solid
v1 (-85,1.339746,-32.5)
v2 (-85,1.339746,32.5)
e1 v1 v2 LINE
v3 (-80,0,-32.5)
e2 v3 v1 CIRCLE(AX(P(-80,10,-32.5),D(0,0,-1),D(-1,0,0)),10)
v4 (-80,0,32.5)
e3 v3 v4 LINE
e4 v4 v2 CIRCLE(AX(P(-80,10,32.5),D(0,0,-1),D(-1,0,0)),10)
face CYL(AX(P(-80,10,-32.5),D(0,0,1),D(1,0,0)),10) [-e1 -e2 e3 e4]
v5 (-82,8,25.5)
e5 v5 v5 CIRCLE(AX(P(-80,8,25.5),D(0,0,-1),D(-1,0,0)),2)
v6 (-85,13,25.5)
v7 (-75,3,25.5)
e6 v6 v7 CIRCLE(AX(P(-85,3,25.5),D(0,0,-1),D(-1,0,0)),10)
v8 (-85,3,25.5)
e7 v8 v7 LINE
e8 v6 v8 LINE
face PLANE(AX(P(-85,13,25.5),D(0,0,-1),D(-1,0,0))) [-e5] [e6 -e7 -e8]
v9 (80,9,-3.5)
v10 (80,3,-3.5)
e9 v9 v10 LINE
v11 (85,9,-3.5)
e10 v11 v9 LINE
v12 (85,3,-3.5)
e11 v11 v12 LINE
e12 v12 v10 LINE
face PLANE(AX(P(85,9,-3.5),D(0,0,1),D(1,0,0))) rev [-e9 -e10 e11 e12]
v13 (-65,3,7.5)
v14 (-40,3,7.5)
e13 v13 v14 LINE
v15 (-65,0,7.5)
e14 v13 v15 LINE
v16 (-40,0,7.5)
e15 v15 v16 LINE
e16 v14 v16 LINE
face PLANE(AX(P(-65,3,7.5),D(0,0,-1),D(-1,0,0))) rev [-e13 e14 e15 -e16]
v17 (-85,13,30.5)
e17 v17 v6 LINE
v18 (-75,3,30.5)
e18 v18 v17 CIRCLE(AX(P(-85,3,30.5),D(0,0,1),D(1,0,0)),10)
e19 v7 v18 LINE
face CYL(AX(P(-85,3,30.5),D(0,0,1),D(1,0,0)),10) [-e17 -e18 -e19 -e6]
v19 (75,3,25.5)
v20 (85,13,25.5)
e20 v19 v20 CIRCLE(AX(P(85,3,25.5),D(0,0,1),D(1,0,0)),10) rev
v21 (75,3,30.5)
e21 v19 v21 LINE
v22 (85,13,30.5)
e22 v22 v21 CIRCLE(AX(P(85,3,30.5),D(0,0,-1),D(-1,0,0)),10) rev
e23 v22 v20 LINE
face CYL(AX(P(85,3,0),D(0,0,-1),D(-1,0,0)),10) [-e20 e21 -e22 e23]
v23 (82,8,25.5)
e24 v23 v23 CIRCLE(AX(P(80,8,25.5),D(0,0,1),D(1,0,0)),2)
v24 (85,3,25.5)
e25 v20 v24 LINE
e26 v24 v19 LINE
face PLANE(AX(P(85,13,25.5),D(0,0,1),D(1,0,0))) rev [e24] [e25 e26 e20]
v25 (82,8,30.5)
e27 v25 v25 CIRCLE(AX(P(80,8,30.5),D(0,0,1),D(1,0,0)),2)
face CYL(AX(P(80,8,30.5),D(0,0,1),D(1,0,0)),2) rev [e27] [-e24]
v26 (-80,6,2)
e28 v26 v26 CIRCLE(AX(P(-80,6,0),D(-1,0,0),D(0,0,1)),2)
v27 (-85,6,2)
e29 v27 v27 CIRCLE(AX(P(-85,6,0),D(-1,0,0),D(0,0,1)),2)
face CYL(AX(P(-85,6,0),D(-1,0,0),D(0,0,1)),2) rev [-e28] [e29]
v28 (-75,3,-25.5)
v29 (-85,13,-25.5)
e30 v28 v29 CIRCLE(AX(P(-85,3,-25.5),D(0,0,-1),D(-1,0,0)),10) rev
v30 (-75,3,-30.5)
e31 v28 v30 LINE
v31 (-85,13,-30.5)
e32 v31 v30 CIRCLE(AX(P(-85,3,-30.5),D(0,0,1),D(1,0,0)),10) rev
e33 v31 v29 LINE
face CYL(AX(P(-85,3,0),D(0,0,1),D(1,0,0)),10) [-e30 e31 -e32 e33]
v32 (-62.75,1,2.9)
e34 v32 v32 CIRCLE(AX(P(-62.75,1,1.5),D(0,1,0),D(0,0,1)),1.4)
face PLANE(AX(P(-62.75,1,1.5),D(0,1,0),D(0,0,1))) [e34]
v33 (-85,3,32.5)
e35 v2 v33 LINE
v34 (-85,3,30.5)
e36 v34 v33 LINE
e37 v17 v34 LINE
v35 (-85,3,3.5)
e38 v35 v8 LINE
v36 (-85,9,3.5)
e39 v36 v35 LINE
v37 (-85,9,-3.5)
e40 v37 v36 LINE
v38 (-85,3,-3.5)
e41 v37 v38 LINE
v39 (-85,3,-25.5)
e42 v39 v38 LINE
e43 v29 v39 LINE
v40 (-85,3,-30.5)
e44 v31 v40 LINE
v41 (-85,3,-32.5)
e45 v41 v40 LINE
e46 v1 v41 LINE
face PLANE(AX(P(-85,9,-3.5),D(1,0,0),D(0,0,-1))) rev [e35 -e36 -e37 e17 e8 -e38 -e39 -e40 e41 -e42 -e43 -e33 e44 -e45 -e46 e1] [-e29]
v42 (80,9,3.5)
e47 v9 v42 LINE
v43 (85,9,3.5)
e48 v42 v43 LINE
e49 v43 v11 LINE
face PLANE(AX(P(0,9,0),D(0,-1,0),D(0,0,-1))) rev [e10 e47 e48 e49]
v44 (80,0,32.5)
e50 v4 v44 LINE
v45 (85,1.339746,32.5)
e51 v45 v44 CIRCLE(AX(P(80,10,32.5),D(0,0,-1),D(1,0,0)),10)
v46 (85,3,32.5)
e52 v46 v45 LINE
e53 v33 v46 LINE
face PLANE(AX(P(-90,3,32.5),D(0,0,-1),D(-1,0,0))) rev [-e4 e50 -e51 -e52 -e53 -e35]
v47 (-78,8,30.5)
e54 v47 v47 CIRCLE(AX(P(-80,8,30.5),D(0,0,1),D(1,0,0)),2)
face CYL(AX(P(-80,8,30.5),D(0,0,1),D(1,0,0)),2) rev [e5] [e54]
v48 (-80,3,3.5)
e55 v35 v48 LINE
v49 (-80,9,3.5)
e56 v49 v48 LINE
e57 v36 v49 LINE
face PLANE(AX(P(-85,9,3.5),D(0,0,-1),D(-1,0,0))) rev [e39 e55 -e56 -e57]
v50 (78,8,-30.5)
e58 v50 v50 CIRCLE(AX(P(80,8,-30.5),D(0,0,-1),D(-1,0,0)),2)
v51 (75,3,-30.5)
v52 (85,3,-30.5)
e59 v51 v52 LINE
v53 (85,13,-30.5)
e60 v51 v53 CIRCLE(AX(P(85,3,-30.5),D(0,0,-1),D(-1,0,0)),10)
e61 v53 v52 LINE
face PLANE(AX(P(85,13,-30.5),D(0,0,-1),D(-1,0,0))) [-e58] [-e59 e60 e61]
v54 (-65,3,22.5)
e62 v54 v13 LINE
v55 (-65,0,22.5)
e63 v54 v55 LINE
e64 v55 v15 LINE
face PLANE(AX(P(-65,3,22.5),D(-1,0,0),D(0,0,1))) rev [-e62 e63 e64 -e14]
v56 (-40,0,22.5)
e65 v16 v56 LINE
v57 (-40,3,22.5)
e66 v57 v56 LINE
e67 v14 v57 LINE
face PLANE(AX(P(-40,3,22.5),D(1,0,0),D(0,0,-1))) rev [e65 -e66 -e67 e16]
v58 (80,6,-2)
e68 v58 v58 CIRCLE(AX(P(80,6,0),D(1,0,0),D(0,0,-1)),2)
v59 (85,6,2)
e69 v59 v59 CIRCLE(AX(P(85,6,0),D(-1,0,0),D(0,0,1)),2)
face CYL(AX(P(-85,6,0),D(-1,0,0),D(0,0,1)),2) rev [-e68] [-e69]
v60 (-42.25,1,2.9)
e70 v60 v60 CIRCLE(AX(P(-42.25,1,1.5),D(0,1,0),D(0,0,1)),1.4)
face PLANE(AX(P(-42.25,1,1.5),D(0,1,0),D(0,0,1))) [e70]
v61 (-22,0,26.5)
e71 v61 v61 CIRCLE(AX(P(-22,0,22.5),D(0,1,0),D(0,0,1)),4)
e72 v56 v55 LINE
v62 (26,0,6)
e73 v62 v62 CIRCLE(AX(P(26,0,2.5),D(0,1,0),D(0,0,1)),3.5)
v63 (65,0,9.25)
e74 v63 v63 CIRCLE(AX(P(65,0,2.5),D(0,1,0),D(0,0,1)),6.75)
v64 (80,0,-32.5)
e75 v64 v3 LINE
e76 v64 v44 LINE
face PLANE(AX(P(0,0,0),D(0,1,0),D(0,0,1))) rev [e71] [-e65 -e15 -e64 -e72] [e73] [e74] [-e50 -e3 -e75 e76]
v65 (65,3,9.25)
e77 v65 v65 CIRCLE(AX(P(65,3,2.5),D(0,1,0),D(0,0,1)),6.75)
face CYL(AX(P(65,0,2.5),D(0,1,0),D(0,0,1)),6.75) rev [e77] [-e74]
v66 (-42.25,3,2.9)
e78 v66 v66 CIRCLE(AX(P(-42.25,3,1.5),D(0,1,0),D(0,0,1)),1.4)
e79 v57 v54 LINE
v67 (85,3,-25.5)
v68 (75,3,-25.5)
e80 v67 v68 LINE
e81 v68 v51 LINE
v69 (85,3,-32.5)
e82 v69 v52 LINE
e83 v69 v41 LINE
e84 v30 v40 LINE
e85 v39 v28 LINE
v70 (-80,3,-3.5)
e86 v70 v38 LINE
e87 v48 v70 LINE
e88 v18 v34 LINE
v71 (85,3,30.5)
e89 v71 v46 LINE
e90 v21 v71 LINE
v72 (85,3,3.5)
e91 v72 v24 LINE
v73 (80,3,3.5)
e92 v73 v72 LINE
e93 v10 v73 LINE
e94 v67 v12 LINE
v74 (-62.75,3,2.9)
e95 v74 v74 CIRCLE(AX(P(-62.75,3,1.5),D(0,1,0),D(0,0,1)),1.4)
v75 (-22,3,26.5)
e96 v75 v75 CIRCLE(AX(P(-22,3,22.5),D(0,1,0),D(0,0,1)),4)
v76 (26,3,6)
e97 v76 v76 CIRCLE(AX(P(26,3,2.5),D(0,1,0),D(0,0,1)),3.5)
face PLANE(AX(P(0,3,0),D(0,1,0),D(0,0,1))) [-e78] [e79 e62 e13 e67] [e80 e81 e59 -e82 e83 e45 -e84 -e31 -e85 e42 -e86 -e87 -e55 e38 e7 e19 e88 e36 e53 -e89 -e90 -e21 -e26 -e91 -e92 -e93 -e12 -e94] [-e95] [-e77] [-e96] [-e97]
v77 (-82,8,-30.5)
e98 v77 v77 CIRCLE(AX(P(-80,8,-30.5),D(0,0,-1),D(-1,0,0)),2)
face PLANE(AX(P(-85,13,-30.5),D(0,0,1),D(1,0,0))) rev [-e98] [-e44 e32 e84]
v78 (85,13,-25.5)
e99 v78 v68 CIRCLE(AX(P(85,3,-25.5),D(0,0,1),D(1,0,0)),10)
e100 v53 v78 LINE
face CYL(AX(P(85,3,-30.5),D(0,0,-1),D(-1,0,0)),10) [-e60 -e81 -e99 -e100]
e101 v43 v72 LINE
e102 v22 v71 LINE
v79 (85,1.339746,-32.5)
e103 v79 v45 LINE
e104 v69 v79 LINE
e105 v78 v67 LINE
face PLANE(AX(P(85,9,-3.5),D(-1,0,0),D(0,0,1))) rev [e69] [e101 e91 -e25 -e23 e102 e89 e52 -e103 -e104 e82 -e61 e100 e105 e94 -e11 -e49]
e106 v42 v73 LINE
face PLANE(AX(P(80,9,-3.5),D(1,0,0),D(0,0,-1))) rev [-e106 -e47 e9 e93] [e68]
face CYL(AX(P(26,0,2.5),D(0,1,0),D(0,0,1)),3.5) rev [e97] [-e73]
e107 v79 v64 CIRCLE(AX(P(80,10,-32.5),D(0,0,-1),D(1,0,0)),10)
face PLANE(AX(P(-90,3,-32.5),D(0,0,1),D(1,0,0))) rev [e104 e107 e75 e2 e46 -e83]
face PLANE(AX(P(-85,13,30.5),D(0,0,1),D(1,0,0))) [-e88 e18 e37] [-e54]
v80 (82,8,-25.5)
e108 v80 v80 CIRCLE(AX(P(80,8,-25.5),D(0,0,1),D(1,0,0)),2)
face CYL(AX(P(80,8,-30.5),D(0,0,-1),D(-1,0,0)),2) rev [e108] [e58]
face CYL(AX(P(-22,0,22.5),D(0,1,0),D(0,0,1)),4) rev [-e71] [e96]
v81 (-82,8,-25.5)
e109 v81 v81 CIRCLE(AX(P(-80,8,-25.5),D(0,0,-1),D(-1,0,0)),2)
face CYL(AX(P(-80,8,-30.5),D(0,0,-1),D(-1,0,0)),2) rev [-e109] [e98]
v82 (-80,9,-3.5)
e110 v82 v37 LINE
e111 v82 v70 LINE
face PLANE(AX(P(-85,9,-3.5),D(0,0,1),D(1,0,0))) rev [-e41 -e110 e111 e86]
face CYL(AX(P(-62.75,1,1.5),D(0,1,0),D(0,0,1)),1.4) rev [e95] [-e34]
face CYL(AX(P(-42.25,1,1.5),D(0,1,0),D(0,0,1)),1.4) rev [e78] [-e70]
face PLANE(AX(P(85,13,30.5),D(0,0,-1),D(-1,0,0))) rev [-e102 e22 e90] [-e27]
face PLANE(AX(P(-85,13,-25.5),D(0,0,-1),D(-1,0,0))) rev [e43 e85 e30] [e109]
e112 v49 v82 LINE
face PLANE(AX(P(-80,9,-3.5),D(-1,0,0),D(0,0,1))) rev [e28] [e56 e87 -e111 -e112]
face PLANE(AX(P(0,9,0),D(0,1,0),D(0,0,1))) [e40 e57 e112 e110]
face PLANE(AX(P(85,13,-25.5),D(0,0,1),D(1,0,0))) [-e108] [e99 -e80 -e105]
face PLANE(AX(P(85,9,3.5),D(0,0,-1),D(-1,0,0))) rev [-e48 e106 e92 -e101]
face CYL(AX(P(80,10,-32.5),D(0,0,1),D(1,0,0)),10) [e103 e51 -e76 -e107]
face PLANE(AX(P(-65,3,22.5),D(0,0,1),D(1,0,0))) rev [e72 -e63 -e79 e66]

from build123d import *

# Parameters (mm, degrees)
SKIZZE1_W                                  = 180
SKIZZE1_H                                  = 65
AUFSATZ_LINEAR_AUSTRAGEN1_DEPTH            = 3
SKIZZE2_W                                  = 25
SKIZZE2_H                                  = 15
SCHNITT_LINEAR_AUSTRAGEN1_DEPTH            = 3
SKIZZE3_W                                  = 5
SKIZZE3_H                                  = 7
AUFSATZ_LINEAR_AUSTRAGEN2_DEPTH            = 6
F_4_0_4_DURCHMESSER_BOHRUNG1_D             = 4
SCHNITT_LINEAR_AUSTRAGEN4_DEPTH            = 112.382224794
SKIZZE7_W                                  = 10
SKIZZE7_H                                  = 5
AUFSATZ_LINEAR_AUSTRAGEN3_DEPTH            = 10
SPIEGELN1_AT_THE_SECOND_PLANE_COPY_1_SKE_W = 10
SPIEGELN1_AT_THE_SECOND_PLANE_COPY_1_SKE_H = 5
SPIEGELN1_AT_THE_SECOND_PLANE_COPY_1_DEPTH = 10
VERRUNDUNG2_R                              = 10
F_4_0_4_DURCHMESSER_BOHRUNG3_D             = 4
F_4_0_4_DURCHMESSER_BOHRUNG3_DEPTH         = 5
F_4_0_4_DURCHMESSER_BOHRUNG4_D             = 4
F_4_0_4_DURCHMESSER_BOHRUNG4_DEPTH         = 5
SKIZZE14_R                                 = 3.5
SKIZZE14_R_2                               = 6.75
SKIZZE14_R_3                               = 4
SCHNITT_LINEAR_AUSTRAGEN5_DEPTH            = 92.549167118
SKIZZE17_R                                 = 1.4
SCHNITT_LINEAR_AUSTRAGEN6_DEPTH            = 2


with BuildPart() as part:
    # Skizze1 → Aufsatz-Linear austragen1 (new body)
    with BuildSketch(Plane(origin=(0, 0, 0), x_dir=(1, 0, 0), z_dir=(0, 1, 0))):
        Rectangle(SKIZZE1_W, SKIZZE1_H)
    extrude(amount=AUFSATZ_LINEAR_AUSTRAGEN1_DEPTH)

    # Skizze2 → Schnitt-Linear austragen1 (cut)
    with BuildSketch(Plane(origin=(0, 0, 0), x_dir=(-1, 0, 0), z_dir=(0, -1, 0))):
        with Locations((52.5, -15)):
            Rectangle(SKIZZE2_W, SKIZZE2_H)
    extrude(amount=-SCHNITT_LINEAR_AUSTRAGEN1_DEPTH, mode=Mode.SUBTRACT)

    # Skizze3 → Aufsatz-Linear austragen2 (add)
    with BuildSketch(Plane(origin=(0, 3, 0), x_dir=(1, 0, 0), z_dir=(0, 1, 0))):
        with Locations((-82.5, 0)):
            Rectangle(SKIZZE3_W, SKIZZE3_H)
        with Locations((82.5, 0)):
            Rectangle(SKIZZE3_W, SKIZZE3_H)
    extrude(amount=AUFSATZ_LINEAR_AUSTRAGEN2_DEPTH)

    # Ø4.0 (4) Durchmesser Bohrung1 (through all)
    with Locations(Plane.ZY.offset(85)):
        with Locations((0, 6)):
            Hole(F_4_0_4_DURCHMESSER_BOHRUNG1_D / 2)

    # Skizze4 → Schnitt-Linear austragen4 (cut, through all)
    with BuildSketch(Plane.XY.offset(32.5)):
        with BuildLine():
            Line((-80, 0), (-90, 0))
            Line((-90, 0), (-90, 3))
            Line((-90, 3), (-85, 3))
            Line((-85, 3), (-85, 1.339745962))
            ThreePointArc((-85, 1.339745962), (-82.588190451, 0.340741737), (-80, 0))
        make_face()
        with BuildLine():
            Line((80, 0), (90, 0))
            Line((90, 0), (90, 3))
            Line((90, 3), (85, 3))
            Line((85, 3), (85, 1.339745962))
            ThreePointArc((85, 1.339745962), (82.588190451, 0.340741737), (80, 0))
        make_face()
    extrude(amount=-SCHNITT_LINEAR_AUSTRAGEN4_DEPTH, mode=Mode.SUBTRACT)

    # Skizze7 → Aufsatz-Linear austragen3 (add)
    with BuildSketch(Plane(origin=(0, 3, 0), x_dir=(1, 0, 0), z_dir=(0, 1, 0))):
        with Locations((-80, 28)):
            Rectangle(SKIZZE7_W, SKIZZE7_H)
    aufsatz_linear_austragen3 = extrude(amount=AUFSATZ_LINEAR_AUSTRAGEN3_DEPTH)

    # Spiegeln1: Aufsatz-Linear austragen3 across plane
    add(aufsatz_linear_austragen3.mirror(Plane(origin=(0, 0, 0), x_dir=(0, 0, 1), z_dir=(1, 0, 0))))

    # Spiegeln1 at the second plane: Aufsatz-Linear austragen3 across plane
    add(aufsatz_linear_austragen3.mirror(Plane.XY))

    # Spiegeln1 at the second plane copy 1 ske → Spiegeln1 at the second plane copy 1 (add)
    with BuildSketch(Plane(origin=(0, 3, 0), x_dir=(-1, 0, 0), z_dir=(0, 1, 0))):
        with Locations((-80, 28)):
            Rectangle(SPIEGELN1_AT_THE_SECOND_PLANE_COPY_1_SKE_W, SPIEGELN1_AT_THE_SECOND_PLANE_COPY_1_SKE_H)
    extrude(amount=SPIEGELN1_AT_THE_SECOND_PLANE_COPY_1_DEPTH)

    # Verrundung2
    verrundung2_edges = [part.edges().sort_by_distance(p)[0] for p in [
        (-75, 13, -28),
        (-75, 13, 28),
        (75, 13, -28),
        (75, 13, 28),
    ]]
    fillet(verrundung2_edges, radius=VERRUNDUNG2_R - 0.0001)  # a hair under: the kernel refuses the full size

    # Ø4.0 (4) Durchmesser Bohrung3
    with Locations(Plane(origin=(0, 0, -30.5), x_dir=(-1, 0, 0), z_dir=(0, 0, -1))):
        with Locations((-80, 8), (80, 8)):
            Hole(F_4_0_4_DURCHMESSER_BOHRUNG3_D / 2, depth=F_4_0_4_DURCHMESSER_BOHRUNG3_DEPTH)

    # Ø4.0 (4) Durchmesser Bohrung4
    with Locations(Plane.XY.offset(30.5)):
        with Locations((-80, 8), (80, 8)):
            Hole(F_4_0_4_DURCHMESSER_BOHRUNG4_D / 2, depth=F_4_0_4_DURCHMESSER_BOHRUNG4_DEPTH)

    # Skizze14 → Schnitt-Linear austragen5 (cut, through all)
    with BuildSketch(Plane(origin=(0, 3, 0), x_dir=(1, 0, 0), z_dir=(0, 1, 0))):
        with Locations(Location((26, -2.5, 0), (0, 0, 270))):
            Circle(SKIZZE14_R)
        with Locations(Location((65, -2.5, 0), (0, 0, 270))):
            Circle(SKIZZE14_R_2)
        with Locations(Location((-22, -22.5, 0), (0, 0, 270))):
            Circle(SKIZZE14_R_3)
    extrude(amount=-SCHNITT_LINEAR_AUSTRAGEN5_DEPTH, mode=Mode.SUBTRACT)

    # Skizze17 → Schnitt-Linear austragen6 (cut)
    with BuildSketch(Plane(origin=(0, 3, 0), x_dir=(1, 0, 0), z_dir=(0, 1, 0))):
        with Locations(Location((-62.75, -1.5, 0), (0, 0, 270))):
            Circle(SKIZZE17_R)
        with Locations(Location((-42.25, -1.5, 0), (0, 0, 270))):
            Circle(SKIZZE17_R)
    extrude(amount=-SCHNITT_LINEAR_AUSTRAGEN6_DEPTH, mode=Mode.SUBTRACT)


solid = part.part
